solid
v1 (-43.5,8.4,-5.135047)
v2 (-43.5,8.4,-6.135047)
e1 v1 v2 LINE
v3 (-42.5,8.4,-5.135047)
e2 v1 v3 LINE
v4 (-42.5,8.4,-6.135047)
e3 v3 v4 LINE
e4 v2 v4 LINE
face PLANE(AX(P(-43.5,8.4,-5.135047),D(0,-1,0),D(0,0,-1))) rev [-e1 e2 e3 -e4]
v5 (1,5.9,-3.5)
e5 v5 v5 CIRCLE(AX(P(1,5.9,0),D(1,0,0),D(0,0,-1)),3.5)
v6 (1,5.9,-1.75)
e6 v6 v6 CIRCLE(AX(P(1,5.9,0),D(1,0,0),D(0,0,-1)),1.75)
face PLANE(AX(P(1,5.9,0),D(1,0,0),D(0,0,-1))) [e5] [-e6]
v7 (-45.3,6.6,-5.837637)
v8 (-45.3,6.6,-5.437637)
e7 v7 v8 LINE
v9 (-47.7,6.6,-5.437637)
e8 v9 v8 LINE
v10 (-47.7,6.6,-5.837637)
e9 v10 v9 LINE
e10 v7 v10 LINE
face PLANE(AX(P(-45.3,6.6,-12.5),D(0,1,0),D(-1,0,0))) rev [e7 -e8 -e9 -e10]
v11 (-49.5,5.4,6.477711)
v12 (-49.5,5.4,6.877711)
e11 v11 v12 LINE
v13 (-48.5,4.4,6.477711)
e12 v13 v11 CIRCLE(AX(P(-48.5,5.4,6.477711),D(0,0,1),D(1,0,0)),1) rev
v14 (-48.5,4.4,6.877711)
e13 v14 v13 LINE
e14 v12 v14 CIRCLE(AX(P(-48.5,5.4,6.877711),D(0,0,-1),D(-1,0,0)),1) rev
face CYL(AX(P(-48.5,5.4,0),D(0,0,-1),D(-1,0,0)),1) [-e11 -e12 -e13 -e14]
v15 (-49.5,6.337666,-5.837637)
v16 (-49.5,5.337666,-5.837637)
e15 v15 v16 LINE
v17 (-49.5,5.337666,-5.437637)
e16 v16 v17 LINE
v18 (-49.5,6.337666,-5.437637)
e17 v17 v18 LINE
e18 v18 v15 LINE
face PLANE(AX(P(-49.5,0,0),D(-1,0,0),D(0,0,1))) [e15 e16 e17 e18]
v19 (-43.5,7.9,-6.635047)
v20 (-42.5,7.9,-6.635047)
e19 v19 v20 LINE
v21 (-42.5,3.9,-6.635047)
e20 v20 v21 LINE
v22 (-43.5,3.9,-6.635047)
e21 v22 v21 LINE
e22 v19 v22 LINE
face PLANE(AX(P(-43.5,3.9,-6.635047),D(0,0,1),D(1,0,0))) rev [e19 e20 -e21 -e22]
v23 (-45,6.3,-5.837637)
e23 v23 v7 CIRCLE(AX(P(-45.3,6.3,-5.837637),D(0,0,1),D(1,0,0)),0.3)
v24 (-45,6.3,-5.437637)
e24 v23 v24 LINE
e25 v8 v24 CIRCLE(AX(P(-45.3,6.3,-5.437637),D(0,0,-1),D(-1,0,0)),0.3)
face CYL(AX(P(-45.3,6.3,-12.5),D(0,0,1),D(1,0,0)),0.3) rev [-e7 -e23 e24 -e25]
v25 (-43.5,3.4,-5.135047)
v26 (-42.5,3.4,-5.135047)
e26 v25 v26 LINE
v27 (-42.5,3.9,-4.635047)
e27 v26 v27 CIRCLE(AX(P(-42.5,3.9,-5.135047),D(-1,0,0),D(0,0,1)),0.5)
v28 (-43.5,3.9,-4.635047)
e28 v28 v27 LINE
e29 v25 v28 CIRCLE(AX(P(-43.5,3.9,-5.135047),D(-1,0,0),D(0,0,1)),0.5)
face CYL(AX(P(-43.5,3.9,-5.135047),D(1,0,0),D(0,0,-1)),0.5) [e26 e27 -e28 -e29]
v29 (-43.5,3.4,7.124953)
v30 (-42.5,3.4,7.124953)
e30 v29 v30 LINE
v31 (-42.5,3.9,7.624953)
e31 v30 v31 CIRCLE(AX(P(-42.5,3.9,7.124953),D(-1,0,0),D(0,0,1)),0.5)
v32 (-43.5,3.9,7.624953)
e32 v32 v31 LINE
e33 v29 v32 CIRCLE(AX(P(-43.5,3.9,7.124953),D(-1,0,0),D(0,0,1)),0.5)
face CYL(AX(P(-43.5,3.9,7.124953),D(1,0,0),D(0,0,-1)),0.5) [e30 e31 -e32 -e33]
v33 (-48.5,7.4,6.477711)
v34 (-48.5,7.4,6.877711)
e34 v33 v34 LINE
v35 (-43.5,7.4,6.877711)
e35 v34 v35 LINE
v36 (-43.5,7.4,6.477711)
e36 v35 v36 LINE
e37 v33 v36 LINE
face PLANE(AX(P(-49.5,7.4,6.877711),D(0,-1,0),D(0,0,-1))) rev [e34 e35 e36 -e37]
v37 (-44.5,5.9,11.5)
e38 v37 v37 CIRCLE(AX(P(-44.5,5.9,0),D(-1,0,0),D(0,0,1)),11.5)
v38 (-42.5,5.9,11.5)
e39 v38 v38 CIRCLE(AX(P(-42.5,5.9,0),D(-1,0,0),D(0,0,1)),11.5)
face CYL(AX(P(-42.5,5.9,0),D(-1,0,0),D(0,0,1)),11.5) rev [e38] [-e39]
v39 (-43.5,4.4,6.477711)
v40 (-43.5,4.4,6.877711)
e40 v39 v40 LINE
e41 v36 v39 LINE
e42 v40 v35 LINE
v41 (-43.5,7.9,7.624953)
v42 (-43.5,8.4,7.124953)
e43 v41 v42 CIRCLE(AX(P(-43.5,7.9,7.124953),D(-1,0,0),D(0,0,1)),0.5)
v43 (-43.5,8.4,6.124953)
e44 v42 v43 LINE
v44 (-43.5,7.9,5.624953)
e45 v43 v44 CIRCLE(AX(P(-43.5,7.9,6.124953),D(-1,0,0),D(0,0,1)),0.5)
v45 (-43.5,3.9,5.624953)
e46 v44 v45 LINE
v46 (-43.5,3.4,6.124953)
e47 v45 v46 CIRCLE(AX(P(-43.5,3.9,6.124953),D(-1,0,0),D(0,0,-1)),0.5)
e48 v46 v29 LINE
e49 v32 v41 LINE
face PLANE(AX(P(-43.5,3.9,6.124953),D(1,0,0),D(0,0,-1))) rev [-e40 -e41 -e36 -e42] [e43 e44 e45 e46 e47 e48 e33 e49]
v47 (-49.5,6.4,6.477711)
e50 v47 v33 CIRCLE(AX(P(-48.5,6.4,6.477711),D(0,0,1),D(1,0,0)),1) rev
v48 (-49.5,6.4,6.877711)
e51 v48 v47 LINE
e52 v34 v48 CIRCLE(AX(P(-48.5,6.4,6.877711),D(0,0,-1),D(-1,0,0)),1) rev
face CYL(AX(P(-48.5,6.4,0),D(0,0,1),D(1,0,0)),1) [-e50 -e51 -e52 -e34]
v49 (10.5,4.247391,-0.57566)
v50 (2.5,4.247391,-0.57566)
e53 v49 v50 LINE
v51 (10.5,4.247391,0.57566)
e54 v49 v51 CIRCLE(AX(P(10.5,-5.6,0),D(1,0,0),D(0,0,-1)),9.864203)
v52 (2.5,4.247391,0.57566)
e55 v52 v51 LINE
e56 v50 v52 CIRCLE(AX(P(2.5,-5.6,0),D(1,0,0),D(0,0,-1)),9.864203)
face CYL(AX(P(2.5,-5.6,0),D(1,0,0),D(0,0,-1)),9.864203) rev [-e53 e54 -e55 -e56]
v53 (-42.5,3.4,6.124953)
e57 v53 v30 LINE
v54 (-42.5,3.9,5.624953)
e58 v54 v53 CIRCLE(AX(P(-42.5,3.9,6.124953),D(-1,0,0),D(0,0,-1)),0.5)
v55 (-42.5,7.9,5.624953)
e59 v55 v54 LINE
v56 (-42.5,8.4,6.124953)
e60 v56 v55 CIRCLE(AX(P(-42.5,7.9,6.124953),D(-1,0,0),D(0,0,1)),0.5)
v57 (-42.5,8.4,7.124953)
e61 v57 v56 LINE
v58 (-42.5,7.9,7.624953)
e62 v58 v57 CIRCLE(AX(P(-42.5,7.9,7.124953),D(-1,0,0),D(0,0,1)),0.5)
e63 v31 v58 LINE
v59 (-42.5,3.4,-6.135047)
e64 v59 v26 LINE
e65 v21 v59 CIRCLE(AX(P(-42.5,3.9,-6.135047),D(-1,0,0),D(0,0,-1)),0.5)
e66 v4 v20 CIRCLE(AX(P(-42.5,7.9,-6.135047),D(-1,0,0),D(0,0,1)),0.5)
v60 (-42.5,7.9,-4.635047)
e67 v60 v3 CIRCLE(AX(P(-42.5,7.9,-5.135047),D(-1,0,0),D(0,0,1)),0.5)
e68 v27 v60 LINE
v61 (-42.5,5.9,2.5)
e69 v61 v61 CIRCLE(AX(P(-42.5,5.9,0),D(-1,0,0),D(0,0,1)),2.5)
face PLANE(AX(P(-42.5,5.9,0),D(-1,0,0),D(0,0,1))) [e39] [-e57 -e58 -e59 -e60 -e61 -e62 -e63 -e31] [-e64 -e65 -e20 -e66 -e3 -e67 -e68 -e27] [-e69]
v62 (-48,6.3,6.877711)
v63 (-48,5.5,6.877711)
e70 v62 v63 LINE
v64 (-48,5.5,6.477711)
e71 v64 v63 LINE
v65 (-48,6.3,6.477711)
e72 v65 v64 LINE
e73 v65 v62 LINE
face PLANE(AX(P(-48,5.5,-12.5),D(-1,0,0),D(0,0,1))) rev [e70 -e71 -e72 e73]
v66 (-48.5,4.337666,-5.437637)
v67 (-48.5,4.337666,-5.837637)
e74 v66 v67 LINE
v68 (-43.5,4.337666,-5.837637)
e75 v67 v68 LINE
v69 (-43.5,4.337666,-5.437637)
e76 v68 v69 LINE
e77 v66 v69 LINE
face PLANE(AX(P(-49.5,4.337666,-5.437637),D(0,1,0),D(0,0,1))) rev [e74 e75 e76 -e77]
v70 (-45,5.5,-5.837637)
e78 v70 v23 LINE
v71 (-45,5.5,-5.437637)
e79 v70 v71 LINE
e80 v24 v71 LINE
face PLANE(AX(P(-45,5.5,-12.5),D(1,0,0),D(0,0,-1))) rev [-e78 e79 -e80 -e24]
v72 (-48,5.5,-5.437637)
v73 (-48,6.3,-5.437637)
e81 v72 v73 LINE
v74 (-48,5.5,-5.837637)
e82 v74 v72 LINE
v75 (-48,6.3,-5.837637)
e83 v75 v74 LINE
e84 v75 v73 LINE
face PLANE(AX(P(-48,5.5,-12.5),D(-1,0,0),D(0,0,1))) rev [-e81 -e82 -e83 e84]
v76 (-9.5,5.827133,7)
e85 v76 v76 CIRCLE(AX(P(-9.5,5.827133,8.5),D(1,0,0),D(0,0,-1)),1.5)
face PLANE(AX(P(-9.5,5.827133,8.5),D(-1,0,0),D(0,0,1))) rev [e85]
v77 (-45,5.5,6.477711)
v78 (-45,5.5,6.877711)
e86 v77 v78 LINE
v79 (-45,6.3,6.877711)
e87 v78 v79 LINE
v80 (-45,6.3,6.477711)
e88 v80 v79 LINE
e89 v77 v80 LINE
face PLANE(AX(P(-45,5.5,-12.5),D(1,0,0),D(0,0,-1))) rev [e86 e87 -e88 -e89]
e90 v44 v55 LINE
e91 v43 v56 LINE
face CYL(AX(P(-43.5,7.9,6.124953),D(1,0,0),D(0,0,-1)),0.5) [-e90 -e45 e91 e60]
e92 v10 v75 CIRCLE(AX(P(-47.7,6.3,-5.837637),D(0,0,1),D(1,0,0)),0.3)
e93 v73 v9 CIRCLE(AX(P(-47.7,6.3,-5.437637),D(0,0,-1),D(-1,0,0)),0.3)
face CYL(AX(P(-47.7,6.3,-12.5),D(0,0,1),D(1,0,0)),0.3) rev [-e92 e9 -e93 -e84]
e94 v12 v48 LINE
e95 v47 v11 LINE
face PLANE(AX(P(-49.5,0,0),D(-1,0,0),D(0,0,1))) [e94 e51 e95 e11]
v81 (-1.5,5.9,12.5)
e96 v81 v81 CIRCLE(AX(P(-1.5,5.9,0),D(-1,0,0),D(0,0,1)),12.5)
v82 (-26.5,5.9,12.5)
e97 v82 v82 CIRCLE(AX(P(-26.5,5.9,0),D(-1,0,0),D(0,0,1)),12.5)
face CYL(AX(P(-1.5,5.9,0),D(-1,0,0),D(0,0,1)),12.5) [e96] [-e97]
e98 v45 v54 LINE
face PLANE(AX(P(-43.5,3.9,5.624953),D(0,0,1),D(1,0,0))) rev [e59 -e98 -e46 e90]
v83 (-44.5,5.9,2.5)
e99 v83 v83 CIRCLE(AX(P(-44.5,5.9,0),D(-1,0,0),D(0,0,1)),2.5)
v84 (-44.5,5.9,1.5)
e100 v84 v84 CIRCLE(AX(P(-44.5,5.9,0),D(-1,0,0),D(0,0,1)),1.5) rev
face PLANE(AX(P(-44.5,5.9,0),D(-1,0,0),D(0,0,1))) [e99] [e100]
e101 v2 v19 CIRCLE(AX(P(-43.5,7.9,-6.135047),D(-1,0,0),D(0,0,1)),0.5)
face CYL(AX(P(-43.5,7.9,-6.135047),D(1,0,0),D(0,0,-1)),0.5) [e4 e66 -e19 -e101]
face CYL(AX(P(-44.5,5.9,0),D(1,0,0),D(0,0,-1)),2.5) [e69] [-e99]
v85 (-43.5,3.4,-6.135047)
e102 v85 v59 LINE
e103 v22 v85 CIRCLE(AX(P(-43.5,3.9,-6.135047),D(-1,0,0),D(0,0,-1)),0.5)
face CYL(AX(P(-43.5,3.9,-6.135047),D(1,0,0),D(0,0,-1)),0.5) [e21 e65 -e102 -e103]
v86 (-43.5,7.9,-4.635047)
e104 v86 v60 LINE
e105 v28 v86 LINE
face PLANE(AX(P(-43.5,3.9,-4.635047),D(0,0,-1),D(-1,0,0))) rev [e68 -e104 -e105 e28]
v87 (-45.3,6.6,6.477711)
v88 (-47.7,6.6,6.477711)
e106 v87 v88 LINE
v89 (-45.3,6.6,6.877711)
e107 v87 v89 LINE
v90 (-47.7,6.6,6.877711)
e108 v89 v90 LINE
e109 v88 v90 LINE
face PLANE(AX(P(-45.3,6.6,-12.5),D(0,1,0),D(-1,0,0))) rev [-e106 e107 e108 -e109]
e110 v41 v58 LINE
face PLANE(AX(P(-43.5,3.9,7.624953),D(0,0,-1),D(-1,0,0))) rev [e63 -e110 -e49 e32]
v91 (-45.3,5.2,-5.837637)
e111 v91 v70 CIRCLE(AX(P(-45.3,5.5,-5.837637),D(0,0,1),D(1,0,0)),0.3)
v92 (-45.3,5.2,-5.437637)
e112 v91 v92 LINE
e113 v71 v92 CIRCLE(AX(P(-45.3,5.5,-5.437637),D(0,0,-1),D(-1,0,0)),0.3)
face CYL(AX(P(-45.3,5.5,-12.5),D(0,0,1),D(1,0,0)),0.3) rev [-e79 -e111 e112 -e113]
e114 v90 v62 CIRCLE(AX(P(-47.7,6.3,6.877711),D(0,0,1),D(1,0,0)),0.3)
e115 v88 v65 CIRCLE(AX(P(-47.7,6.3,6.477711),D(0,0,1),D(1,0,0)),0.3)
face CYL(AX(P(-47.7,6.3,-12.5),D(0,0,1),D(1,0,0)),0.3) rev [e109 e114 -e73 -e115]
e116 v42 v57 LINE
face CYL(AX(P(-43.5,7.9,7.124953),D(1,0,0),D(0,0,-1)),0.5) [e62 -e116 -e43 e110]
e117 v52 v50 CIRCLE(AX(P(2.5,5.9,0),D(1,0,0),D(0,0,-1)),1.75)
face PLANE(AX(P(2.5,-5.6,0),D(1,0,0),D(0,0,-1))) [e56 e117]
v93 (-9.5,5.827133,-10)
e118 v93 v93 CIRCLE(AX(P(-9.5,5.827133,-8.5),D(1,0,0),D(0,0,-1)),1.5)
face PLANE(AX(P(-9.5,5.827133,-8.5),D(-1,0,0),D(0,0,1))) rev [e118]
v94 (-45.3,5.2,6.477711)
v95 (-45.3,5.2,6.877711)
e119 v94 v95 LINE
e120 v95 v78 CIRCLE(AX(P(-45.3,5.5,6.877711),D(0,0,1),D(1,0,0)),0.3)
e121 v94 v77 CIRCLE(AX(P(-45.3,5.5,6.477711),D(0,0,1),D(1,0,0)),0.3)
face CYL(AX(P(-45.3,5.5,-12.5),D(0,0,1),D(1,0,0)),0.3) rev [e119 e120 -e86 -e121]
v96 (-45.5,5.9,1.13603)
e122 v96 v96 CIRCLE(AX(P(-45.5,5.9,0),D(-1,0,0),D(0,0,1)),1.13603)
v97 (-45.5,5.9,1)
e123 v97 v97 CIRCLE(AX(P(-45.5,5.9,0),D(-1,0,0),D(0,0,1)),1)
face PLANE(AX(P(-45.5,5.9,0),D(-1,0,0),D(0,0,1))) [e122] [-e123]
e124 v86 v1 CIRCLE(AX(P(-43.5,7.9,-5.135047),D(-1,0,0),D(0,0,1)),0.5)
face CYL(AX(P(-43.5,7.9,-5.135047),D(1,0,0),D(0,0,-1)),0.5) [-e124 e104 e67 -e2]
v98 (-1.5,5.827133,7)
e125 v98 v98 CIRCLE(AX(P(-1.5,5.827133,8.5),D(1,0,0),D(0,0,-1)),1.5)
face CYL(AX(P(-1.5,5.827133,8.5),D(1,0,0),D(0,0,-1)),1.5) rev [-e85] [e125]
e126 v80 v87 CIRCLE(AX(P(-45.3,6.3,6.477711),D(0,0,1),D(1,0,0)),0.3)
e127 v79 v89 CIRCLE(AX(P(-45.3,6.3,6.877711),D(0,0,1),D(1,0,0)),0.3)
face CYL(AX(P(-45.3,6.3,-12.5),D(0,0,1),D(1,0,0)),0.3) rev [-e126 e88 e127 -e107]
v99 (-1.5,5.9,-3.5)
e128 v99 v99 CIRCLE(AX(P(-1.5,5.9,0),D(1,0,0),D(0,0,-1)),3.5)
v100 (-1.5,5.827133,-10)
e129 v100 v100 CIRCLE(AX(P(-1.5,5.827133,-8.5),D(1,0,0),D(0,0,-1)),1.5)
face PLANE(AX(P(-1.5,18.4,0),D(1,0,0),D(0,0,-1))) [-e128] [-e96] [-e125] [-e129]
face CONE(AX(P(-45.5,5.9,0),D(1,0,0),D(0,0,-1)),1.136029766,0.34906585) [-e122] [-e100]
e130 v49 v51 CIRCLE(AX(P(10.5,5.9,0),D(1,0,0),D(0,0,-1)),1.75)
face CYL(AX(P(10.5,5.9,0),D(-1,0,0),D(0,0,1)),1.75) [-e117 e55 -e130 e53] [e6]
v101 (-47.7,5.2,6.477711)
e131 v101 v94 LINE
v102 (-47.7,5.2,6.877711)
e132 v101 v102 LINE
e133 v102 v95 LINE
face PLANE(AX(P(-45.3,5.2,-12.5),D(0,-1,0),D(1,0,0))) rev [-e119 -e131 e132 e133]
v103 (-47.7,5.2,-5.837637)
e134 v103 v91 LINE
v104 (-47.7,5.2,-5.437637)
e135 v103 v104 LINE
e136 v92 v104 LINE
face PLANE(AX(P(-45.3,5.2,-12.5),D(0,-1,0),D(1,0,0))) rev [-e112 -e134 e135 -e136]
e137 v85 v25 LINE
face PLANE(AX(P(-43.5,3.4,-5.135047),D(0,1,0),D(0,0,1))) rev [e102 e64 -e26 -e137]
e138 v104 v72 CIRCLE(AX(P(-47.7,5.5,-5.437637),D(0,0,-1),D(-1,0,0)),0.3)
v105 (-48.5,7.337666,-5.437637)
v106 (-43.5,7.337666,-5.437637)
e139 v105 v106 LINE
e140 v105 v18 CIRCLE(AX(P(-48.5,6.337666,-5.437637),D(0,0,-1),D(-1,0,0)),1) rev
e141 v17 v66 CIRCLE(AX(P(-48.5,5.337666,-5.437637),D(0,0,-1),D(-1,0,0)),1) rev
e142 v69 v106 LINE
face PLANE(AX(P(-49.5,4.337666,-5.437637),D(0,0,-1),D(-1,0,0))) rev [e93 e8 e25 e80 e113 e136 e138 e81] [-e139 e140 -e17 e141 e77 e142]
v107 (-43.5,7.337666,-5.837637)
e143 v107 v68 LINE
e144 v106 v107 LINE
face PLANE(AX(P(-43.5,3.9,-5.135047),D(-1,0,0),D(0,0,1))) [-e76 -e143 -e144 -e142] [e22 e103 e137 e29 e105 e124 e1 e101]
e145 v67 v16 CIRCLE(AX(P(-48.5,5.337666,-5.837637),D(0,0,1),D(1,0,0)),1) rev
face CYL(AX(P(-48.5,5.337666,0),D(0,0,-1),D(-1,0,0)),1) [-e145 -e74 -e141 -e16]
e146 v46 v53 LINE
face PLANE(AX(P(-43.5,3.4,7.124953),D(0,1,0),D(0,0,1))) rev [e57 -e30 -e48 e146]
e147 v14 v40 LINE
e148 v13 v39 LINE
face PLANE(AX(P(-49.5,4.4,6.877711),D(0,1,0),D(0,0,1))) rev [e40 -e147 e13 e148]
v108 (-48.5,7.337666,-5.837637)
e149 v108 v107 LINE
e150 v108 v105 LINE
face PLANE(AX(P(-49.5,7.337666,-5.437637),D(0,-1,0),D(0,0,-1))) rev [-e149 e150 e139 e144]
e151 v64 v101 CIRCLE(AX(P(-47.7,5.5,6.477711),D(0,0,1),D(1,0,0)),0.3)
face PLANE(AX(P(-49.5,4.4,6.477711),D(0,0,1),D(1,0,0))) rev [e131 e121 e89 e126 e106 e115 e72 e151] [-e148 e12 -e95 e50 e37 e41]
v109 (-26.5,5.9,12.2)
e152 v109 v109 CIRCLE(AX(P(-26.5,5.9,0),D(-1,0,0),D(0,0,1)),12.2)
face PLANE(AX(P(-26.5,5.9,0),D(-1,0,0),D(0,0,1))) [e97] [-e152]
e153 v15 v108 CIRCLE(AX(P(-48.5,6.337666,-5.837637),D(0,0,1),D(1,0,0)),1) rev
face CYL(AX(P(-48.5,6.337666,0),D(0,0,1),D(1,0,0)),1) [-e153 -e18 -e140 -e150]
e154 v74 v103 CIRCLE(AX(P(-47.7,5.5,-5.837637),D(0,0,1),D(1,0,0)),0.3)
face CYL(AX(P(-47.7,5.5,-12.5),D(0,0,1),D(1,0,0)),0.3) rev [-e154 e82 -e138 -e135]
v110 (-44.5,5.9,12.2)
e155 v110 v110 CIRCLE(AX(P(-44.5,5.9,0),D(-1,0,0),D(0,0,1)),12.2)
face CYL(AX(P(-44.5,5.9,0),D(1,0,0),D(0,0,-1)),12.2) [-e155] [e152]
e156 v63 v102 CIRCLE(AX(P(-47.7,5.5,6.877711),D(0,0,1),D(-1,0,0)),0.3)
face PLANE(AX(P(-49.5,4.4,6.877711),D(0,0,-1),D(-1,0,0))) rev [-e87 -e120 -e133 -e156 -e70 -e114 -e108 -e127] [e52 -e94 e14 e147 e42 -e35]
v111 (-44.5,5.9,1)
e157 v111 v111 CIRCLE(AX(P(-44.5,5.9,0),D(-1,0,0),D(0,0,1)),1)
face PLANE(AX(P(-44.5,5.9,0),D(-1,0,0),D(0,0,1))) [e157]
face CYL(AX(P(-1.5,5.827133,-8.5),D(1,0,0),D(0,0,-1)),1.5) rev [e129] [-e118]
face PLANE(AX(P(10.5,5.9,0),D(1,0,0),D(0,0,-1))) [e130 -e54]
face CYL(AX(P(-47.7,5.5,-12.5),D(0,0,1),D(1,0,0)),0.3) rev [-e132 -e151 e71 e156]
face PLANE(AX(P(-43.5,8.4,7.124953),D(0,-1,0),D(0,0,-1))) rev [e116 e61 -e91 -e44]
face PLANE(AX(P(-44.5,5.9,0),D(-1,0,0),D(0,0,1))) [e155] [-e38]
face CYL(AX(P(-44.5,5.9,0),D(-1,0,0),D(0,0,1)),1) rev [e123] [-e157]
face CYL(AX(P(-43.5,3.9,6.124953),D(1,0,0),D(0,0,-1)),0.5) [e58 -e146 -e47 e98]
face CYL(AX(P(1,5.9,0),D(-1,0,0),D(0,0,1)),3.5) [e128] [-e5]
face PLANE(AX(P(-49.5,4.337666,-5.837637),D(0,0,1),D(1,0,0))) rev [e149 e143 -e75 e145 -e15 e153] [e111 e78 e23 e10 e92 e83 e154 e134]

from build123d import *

# Parameters (mm, degrees)
CROQUIS1_W                        = 25
CROQUIS1_H                        = 12.5
CROQUIS2_R                        = 3.5
SALIENTE_EXTRUIR1_DEPTH           = 2.5
CROQUIS3_R                        = 1.75
SALIENTE_EXTRUIR2_DEPTH           = 9.5
CORTAR_EXTRUIR1_DEPTH             = 8
CROQUIS5_R                        = 12.2
SALIENTE_EXTRUIR3_DEPTH           = 18
DI_METRO_DE_TALADRO_3_0_3_1_D     = 3
DI_METRO_DE_TALADRO_3_0_3_1_DEPTH = 8
CROQUIS10_R                       = 11.5
CORTAR_EXTRUIR2_DEPTH             = 2
SALIENTE_EXTRUIR4_DEPTH           = 1
CROQUIS12_W                       = 0.4
CROQUIS12_H                       = 3
SALIENTE_EXTRUIR5_DEPTH           = 6
REDONDEO1_R                       = 1
CORTAR_EXTRUIR3_DEPTH             = 57.252161552
CROQUIS15_R                       = 2.5
SALIENTE_EXTRUIR6_DEPTH           = 2
CROQUIS16_R                       = 1.5
SALIENTE_EXTRUIR7_DEPTH           = 3
CHAFL_N1_SIZE2                    = 0.363970234
CHAFL_N1_SIZE                     = 1
CROQUIS17_R                       = 1
CORTAR_EXTRUIR4_DEPTH             = 1


with BuildPart() as part:
    # Croquis1 → Revolución1 (revolve)
    with BuildSketch(Plane(origin=(0, 0, 0), x_dir=(-1, 0, 0), z_dir=(0, 0, -1)), mode=Mode.PRIVATE) as revoluci_n1_sk:
        with Locations((14, 12.15)):
            Rectangle(CROQUIS1_W, CROQUIS1_H)
    revolve(revoluci_n1_sk.sketch.rotate(Axis((-1.5, 5.9, 0), (-1, 0, 0)), 270), axis=Axis((-1.5, 5.9, 0), (-1, 0, 0)))

    # Croquis2 → Saliente-Extruir1 (add)
    with BuildSketch(Plane(origin=(-1.5, 0, 0), x_dir=(0, 0, -1), z_dir=(1, 0, 0))):
        with Locations((0, 5.9)):
            Circle(CROQUIS2_R)
    extrude(amount=SALIENTE_EXTRUIR1_DEPTH)

    # Croquis3 → Saliente-Extruir2 (add)
    with BuildSketch(Plane(origin=(1, 0, 0), x_dir=(0, 0, -1), z_dir=(1, 0, 0))):
        with Locations((0, 5.9)):
            Circle(CROQUIS3_R)
    extrude(amount=SALIENTE_EXTRUIR2_DEPTH)

    # Croquis4 → Cortar-Extruir1 (cut)
    with BuildSketch(Plane(origin=(10.5, 0, 0), x_dir=(0, 0, -1), z_dir=(1, 0, 0))):
        with BuildLine():
            Line((-1.496663044, 4.15), (1.496663044, 4.15))
            ThreePointArc((1.496663044, 4.15), (0, 4.264202971), (-1.496663044, 4.15))
        make_face()
    extrude(amount=-CORTAR_EXTRUIR1_DEPTH, mode=Mode.SUBTRACT)

    # Croquis5 → Saliente-Extruir3 (add)
    with BuildSketch(Plane.ZY.offset(26.5)):
        with Locations((0, 5.9)):
            Circle(CROQUIS5_R)
    extrude(amount=SALIENTE_EXTRUIR3_DEPTH)

    # Diámetro de taladro Ø3.0 (3)1
    with Locations(Plane(origin=(-1.5, 0, 0), x_dir=(0, 0, -1), z_dir=(1, 0, 0))):
        with Locations((-8.5, 5.827133015), (8.5, 5.827133015)):
            Hole(DI_METRO_DE_TALADRO_3_0_3_1_D / 2, depth=DI_METRO_DE_TALADRO_3_0_3_1_DEPTH)

    # Croquis10 → Cortar-Extruir2 (cut)
    with BuildSketch(Plane.ZY.offset(44.5)):
        with Locations((0, 5.9)):
            Circle(CROQUIS10_R)
    extrude(amount=-CORTAR_EXTRUIR2_DEPTH, mode=Mode.SUBTRACT)

    # Croquis11 → Saliente-Extruir4 (add)
    with BuildSketch(Plane.ZY.offset(42.5)):
        with BuildLine():
            Line((-5.135046812, 3.4), (-6.135046812, 3.4))
            ThreePointArc((-6.135046812, 3.4), (-6.488600202, 3.546446609), (-6.635046812, 3.9))
            Line((-6.635046812, 3.9), (-6.635046812, 7.9))
            ThreePointArc((-6.635046812, 7.9), (-6.488600202, 8.253553391), (-6.135046812, 8.4))
            Line((-6.135046812, 8.4), (-5.135046812, 8.4))
            ThreePointArc((-5.135046812, 8.4), (-4.781493421, 8.253553391), (-4.635046812, 7.9))
            Line((-4.635046812, 7.9), (-4.635046812, 3.9))
            ThreePointArc((-4.635046812, 3.9), (-4.781493421, 3.546446609), (-5.135046812, 3.4))
        make_face()
        with BuildLine():
            Line((7.124953188, 3.4), (6.124953188, 3.4))
            ThreePointArc((6.124953188, 3.4), (5.771399798, 3.546446609), (5.624953188, 3.9))
            Line((5.624953188, 3.9), (5.624953188, 7.9))
            ThreePointArc((5.624953188, 7.9), (5.771399798, 8.253553391), (6.124953188, 8.4))
            Line((6.124953188, 8.4), (7.124953188, 8.4))
            ThreePointArc((7.124953188, 8.4), (7.478506579, 8.253553391), (7.624953188, 7.9))
            Line((7.624953188, 7.9), (7.624953188, 3.9))
            ThreePointArc((7.624953188, 3.9), (7.478506579, 3.546446609), (7.124953188, 3.4))
        make_face()
    extrude(amount=SALIENTE_EXTRUIR4_DEPTH)

    # Croquis12 → Saliente-Extruir5 (add)
    with BuildSketch(Plane.ZY.offset(43.5)):
        with Locations((-5.637636684, 5.837666005)):
            Rectangle(CROQUIS12_W, CROQUIS12_H)
        with Locations((6.677710889, 5.9)):
            Rectangle(CROQUIS12_W, CROQUIS12_H)
    extrude(amount=SALIENTE_EXTRUIR5_DEPTH)

    # Redondeo1
    redondeo1_edges = [part.edges().sort_by_distance(p)[0] for p in [
        (-49.5, 4.337666005, -5.637636684),
        (-49.5, 7.337666005, -5.637636684),
        (-49.5, 4.4, 6.677710889),
        (-49.5, 7.4, 6.677710889),
    ]]
    fillet(redondeo1_edges, radius=REDONDEO1_R)

    # Croquis14 → Cortar-Extruir3 (cut, through all)
    with BuildSketch(Plane.XY.offset(6.877710889)):
        with BuildLine():
            Line((-45.3, 5.2), (-47.7, 5.2))
            ThreePointArc((-47.7, 5.2), (-47.912132034, 5.287867966), (-48, 5.5))
            Line((-48, 5.5), (-48, 6.3))
            ThreePointArc((-48, 6.3), (-47.912132034, 6.512132034), (-47.7, 6.6))
            Line((-47.7, 6.6), (-45.3, 6.6))
            ThreePointArc((-45.3, 6.6), (-45.087867966, 6.512132034), (-45, 6.3))
            Line((-45, 6.3), (-45, 5.5))
            ThreePointArc((-45, 5.5), (-45.087867966, 5.287867966), (-45.3, 5.2))
        make_face()
    extrude(amount=-CORTAR_EXTRUIR3_DEPTH, mode=Mode.SUBTRACT)

    # Croquis15 → Saliente-Extruir6 (add)
    with BuildSketch(Plane.ZY.offset(42.5)):
        with Locations((0, 5.9)):
            Circle(CROQUIS15_R)
    extrude(amount=SALIENTE_EXTRUIR6_DEPTH)

    # Croquis16 → Saliente-Extruir7 (add)
    with BuildSketch(Plane.ZY.offset(42.5)):
        with Locations((0, 5.9)):
            Circle(CROQUIS16_R)
    extrude(amount=SALIENTE_EXTRUIR7_DEPTH)

    # Chaflán1
    chafl_n1_edges = [part.edges().sort_by_distance(p)[0] for p in [
        (-45.5, 5.9, -1.5),
    ]]
    chafl_n1_side = [part.faces().sort_by_distance(p)[0] for p in [
        (-45.492720595, 5.9, -1.5),
    ]]
    chamfer(chafl_n1_edges, length=CHAFL_N1_SIZE - 0.0001, length2=CHAFL_N1_SIZE2 - 0.0001, reference=chafl_n1_side[0])  # a hair under: the kernel refuses the full size

    # Croquis17 → Cortar-Extruir4 (cut)
    with BuildSketch(Plane.ZY.offset(45.5)):
        with Locations((0, 5.9)):
            Circle(CROQUIS17_R)
    extrude(amount=-CORTAR_EXTRUIR4_DEPTH, mode=Mode.SUBTRACT)


solid = part.part
